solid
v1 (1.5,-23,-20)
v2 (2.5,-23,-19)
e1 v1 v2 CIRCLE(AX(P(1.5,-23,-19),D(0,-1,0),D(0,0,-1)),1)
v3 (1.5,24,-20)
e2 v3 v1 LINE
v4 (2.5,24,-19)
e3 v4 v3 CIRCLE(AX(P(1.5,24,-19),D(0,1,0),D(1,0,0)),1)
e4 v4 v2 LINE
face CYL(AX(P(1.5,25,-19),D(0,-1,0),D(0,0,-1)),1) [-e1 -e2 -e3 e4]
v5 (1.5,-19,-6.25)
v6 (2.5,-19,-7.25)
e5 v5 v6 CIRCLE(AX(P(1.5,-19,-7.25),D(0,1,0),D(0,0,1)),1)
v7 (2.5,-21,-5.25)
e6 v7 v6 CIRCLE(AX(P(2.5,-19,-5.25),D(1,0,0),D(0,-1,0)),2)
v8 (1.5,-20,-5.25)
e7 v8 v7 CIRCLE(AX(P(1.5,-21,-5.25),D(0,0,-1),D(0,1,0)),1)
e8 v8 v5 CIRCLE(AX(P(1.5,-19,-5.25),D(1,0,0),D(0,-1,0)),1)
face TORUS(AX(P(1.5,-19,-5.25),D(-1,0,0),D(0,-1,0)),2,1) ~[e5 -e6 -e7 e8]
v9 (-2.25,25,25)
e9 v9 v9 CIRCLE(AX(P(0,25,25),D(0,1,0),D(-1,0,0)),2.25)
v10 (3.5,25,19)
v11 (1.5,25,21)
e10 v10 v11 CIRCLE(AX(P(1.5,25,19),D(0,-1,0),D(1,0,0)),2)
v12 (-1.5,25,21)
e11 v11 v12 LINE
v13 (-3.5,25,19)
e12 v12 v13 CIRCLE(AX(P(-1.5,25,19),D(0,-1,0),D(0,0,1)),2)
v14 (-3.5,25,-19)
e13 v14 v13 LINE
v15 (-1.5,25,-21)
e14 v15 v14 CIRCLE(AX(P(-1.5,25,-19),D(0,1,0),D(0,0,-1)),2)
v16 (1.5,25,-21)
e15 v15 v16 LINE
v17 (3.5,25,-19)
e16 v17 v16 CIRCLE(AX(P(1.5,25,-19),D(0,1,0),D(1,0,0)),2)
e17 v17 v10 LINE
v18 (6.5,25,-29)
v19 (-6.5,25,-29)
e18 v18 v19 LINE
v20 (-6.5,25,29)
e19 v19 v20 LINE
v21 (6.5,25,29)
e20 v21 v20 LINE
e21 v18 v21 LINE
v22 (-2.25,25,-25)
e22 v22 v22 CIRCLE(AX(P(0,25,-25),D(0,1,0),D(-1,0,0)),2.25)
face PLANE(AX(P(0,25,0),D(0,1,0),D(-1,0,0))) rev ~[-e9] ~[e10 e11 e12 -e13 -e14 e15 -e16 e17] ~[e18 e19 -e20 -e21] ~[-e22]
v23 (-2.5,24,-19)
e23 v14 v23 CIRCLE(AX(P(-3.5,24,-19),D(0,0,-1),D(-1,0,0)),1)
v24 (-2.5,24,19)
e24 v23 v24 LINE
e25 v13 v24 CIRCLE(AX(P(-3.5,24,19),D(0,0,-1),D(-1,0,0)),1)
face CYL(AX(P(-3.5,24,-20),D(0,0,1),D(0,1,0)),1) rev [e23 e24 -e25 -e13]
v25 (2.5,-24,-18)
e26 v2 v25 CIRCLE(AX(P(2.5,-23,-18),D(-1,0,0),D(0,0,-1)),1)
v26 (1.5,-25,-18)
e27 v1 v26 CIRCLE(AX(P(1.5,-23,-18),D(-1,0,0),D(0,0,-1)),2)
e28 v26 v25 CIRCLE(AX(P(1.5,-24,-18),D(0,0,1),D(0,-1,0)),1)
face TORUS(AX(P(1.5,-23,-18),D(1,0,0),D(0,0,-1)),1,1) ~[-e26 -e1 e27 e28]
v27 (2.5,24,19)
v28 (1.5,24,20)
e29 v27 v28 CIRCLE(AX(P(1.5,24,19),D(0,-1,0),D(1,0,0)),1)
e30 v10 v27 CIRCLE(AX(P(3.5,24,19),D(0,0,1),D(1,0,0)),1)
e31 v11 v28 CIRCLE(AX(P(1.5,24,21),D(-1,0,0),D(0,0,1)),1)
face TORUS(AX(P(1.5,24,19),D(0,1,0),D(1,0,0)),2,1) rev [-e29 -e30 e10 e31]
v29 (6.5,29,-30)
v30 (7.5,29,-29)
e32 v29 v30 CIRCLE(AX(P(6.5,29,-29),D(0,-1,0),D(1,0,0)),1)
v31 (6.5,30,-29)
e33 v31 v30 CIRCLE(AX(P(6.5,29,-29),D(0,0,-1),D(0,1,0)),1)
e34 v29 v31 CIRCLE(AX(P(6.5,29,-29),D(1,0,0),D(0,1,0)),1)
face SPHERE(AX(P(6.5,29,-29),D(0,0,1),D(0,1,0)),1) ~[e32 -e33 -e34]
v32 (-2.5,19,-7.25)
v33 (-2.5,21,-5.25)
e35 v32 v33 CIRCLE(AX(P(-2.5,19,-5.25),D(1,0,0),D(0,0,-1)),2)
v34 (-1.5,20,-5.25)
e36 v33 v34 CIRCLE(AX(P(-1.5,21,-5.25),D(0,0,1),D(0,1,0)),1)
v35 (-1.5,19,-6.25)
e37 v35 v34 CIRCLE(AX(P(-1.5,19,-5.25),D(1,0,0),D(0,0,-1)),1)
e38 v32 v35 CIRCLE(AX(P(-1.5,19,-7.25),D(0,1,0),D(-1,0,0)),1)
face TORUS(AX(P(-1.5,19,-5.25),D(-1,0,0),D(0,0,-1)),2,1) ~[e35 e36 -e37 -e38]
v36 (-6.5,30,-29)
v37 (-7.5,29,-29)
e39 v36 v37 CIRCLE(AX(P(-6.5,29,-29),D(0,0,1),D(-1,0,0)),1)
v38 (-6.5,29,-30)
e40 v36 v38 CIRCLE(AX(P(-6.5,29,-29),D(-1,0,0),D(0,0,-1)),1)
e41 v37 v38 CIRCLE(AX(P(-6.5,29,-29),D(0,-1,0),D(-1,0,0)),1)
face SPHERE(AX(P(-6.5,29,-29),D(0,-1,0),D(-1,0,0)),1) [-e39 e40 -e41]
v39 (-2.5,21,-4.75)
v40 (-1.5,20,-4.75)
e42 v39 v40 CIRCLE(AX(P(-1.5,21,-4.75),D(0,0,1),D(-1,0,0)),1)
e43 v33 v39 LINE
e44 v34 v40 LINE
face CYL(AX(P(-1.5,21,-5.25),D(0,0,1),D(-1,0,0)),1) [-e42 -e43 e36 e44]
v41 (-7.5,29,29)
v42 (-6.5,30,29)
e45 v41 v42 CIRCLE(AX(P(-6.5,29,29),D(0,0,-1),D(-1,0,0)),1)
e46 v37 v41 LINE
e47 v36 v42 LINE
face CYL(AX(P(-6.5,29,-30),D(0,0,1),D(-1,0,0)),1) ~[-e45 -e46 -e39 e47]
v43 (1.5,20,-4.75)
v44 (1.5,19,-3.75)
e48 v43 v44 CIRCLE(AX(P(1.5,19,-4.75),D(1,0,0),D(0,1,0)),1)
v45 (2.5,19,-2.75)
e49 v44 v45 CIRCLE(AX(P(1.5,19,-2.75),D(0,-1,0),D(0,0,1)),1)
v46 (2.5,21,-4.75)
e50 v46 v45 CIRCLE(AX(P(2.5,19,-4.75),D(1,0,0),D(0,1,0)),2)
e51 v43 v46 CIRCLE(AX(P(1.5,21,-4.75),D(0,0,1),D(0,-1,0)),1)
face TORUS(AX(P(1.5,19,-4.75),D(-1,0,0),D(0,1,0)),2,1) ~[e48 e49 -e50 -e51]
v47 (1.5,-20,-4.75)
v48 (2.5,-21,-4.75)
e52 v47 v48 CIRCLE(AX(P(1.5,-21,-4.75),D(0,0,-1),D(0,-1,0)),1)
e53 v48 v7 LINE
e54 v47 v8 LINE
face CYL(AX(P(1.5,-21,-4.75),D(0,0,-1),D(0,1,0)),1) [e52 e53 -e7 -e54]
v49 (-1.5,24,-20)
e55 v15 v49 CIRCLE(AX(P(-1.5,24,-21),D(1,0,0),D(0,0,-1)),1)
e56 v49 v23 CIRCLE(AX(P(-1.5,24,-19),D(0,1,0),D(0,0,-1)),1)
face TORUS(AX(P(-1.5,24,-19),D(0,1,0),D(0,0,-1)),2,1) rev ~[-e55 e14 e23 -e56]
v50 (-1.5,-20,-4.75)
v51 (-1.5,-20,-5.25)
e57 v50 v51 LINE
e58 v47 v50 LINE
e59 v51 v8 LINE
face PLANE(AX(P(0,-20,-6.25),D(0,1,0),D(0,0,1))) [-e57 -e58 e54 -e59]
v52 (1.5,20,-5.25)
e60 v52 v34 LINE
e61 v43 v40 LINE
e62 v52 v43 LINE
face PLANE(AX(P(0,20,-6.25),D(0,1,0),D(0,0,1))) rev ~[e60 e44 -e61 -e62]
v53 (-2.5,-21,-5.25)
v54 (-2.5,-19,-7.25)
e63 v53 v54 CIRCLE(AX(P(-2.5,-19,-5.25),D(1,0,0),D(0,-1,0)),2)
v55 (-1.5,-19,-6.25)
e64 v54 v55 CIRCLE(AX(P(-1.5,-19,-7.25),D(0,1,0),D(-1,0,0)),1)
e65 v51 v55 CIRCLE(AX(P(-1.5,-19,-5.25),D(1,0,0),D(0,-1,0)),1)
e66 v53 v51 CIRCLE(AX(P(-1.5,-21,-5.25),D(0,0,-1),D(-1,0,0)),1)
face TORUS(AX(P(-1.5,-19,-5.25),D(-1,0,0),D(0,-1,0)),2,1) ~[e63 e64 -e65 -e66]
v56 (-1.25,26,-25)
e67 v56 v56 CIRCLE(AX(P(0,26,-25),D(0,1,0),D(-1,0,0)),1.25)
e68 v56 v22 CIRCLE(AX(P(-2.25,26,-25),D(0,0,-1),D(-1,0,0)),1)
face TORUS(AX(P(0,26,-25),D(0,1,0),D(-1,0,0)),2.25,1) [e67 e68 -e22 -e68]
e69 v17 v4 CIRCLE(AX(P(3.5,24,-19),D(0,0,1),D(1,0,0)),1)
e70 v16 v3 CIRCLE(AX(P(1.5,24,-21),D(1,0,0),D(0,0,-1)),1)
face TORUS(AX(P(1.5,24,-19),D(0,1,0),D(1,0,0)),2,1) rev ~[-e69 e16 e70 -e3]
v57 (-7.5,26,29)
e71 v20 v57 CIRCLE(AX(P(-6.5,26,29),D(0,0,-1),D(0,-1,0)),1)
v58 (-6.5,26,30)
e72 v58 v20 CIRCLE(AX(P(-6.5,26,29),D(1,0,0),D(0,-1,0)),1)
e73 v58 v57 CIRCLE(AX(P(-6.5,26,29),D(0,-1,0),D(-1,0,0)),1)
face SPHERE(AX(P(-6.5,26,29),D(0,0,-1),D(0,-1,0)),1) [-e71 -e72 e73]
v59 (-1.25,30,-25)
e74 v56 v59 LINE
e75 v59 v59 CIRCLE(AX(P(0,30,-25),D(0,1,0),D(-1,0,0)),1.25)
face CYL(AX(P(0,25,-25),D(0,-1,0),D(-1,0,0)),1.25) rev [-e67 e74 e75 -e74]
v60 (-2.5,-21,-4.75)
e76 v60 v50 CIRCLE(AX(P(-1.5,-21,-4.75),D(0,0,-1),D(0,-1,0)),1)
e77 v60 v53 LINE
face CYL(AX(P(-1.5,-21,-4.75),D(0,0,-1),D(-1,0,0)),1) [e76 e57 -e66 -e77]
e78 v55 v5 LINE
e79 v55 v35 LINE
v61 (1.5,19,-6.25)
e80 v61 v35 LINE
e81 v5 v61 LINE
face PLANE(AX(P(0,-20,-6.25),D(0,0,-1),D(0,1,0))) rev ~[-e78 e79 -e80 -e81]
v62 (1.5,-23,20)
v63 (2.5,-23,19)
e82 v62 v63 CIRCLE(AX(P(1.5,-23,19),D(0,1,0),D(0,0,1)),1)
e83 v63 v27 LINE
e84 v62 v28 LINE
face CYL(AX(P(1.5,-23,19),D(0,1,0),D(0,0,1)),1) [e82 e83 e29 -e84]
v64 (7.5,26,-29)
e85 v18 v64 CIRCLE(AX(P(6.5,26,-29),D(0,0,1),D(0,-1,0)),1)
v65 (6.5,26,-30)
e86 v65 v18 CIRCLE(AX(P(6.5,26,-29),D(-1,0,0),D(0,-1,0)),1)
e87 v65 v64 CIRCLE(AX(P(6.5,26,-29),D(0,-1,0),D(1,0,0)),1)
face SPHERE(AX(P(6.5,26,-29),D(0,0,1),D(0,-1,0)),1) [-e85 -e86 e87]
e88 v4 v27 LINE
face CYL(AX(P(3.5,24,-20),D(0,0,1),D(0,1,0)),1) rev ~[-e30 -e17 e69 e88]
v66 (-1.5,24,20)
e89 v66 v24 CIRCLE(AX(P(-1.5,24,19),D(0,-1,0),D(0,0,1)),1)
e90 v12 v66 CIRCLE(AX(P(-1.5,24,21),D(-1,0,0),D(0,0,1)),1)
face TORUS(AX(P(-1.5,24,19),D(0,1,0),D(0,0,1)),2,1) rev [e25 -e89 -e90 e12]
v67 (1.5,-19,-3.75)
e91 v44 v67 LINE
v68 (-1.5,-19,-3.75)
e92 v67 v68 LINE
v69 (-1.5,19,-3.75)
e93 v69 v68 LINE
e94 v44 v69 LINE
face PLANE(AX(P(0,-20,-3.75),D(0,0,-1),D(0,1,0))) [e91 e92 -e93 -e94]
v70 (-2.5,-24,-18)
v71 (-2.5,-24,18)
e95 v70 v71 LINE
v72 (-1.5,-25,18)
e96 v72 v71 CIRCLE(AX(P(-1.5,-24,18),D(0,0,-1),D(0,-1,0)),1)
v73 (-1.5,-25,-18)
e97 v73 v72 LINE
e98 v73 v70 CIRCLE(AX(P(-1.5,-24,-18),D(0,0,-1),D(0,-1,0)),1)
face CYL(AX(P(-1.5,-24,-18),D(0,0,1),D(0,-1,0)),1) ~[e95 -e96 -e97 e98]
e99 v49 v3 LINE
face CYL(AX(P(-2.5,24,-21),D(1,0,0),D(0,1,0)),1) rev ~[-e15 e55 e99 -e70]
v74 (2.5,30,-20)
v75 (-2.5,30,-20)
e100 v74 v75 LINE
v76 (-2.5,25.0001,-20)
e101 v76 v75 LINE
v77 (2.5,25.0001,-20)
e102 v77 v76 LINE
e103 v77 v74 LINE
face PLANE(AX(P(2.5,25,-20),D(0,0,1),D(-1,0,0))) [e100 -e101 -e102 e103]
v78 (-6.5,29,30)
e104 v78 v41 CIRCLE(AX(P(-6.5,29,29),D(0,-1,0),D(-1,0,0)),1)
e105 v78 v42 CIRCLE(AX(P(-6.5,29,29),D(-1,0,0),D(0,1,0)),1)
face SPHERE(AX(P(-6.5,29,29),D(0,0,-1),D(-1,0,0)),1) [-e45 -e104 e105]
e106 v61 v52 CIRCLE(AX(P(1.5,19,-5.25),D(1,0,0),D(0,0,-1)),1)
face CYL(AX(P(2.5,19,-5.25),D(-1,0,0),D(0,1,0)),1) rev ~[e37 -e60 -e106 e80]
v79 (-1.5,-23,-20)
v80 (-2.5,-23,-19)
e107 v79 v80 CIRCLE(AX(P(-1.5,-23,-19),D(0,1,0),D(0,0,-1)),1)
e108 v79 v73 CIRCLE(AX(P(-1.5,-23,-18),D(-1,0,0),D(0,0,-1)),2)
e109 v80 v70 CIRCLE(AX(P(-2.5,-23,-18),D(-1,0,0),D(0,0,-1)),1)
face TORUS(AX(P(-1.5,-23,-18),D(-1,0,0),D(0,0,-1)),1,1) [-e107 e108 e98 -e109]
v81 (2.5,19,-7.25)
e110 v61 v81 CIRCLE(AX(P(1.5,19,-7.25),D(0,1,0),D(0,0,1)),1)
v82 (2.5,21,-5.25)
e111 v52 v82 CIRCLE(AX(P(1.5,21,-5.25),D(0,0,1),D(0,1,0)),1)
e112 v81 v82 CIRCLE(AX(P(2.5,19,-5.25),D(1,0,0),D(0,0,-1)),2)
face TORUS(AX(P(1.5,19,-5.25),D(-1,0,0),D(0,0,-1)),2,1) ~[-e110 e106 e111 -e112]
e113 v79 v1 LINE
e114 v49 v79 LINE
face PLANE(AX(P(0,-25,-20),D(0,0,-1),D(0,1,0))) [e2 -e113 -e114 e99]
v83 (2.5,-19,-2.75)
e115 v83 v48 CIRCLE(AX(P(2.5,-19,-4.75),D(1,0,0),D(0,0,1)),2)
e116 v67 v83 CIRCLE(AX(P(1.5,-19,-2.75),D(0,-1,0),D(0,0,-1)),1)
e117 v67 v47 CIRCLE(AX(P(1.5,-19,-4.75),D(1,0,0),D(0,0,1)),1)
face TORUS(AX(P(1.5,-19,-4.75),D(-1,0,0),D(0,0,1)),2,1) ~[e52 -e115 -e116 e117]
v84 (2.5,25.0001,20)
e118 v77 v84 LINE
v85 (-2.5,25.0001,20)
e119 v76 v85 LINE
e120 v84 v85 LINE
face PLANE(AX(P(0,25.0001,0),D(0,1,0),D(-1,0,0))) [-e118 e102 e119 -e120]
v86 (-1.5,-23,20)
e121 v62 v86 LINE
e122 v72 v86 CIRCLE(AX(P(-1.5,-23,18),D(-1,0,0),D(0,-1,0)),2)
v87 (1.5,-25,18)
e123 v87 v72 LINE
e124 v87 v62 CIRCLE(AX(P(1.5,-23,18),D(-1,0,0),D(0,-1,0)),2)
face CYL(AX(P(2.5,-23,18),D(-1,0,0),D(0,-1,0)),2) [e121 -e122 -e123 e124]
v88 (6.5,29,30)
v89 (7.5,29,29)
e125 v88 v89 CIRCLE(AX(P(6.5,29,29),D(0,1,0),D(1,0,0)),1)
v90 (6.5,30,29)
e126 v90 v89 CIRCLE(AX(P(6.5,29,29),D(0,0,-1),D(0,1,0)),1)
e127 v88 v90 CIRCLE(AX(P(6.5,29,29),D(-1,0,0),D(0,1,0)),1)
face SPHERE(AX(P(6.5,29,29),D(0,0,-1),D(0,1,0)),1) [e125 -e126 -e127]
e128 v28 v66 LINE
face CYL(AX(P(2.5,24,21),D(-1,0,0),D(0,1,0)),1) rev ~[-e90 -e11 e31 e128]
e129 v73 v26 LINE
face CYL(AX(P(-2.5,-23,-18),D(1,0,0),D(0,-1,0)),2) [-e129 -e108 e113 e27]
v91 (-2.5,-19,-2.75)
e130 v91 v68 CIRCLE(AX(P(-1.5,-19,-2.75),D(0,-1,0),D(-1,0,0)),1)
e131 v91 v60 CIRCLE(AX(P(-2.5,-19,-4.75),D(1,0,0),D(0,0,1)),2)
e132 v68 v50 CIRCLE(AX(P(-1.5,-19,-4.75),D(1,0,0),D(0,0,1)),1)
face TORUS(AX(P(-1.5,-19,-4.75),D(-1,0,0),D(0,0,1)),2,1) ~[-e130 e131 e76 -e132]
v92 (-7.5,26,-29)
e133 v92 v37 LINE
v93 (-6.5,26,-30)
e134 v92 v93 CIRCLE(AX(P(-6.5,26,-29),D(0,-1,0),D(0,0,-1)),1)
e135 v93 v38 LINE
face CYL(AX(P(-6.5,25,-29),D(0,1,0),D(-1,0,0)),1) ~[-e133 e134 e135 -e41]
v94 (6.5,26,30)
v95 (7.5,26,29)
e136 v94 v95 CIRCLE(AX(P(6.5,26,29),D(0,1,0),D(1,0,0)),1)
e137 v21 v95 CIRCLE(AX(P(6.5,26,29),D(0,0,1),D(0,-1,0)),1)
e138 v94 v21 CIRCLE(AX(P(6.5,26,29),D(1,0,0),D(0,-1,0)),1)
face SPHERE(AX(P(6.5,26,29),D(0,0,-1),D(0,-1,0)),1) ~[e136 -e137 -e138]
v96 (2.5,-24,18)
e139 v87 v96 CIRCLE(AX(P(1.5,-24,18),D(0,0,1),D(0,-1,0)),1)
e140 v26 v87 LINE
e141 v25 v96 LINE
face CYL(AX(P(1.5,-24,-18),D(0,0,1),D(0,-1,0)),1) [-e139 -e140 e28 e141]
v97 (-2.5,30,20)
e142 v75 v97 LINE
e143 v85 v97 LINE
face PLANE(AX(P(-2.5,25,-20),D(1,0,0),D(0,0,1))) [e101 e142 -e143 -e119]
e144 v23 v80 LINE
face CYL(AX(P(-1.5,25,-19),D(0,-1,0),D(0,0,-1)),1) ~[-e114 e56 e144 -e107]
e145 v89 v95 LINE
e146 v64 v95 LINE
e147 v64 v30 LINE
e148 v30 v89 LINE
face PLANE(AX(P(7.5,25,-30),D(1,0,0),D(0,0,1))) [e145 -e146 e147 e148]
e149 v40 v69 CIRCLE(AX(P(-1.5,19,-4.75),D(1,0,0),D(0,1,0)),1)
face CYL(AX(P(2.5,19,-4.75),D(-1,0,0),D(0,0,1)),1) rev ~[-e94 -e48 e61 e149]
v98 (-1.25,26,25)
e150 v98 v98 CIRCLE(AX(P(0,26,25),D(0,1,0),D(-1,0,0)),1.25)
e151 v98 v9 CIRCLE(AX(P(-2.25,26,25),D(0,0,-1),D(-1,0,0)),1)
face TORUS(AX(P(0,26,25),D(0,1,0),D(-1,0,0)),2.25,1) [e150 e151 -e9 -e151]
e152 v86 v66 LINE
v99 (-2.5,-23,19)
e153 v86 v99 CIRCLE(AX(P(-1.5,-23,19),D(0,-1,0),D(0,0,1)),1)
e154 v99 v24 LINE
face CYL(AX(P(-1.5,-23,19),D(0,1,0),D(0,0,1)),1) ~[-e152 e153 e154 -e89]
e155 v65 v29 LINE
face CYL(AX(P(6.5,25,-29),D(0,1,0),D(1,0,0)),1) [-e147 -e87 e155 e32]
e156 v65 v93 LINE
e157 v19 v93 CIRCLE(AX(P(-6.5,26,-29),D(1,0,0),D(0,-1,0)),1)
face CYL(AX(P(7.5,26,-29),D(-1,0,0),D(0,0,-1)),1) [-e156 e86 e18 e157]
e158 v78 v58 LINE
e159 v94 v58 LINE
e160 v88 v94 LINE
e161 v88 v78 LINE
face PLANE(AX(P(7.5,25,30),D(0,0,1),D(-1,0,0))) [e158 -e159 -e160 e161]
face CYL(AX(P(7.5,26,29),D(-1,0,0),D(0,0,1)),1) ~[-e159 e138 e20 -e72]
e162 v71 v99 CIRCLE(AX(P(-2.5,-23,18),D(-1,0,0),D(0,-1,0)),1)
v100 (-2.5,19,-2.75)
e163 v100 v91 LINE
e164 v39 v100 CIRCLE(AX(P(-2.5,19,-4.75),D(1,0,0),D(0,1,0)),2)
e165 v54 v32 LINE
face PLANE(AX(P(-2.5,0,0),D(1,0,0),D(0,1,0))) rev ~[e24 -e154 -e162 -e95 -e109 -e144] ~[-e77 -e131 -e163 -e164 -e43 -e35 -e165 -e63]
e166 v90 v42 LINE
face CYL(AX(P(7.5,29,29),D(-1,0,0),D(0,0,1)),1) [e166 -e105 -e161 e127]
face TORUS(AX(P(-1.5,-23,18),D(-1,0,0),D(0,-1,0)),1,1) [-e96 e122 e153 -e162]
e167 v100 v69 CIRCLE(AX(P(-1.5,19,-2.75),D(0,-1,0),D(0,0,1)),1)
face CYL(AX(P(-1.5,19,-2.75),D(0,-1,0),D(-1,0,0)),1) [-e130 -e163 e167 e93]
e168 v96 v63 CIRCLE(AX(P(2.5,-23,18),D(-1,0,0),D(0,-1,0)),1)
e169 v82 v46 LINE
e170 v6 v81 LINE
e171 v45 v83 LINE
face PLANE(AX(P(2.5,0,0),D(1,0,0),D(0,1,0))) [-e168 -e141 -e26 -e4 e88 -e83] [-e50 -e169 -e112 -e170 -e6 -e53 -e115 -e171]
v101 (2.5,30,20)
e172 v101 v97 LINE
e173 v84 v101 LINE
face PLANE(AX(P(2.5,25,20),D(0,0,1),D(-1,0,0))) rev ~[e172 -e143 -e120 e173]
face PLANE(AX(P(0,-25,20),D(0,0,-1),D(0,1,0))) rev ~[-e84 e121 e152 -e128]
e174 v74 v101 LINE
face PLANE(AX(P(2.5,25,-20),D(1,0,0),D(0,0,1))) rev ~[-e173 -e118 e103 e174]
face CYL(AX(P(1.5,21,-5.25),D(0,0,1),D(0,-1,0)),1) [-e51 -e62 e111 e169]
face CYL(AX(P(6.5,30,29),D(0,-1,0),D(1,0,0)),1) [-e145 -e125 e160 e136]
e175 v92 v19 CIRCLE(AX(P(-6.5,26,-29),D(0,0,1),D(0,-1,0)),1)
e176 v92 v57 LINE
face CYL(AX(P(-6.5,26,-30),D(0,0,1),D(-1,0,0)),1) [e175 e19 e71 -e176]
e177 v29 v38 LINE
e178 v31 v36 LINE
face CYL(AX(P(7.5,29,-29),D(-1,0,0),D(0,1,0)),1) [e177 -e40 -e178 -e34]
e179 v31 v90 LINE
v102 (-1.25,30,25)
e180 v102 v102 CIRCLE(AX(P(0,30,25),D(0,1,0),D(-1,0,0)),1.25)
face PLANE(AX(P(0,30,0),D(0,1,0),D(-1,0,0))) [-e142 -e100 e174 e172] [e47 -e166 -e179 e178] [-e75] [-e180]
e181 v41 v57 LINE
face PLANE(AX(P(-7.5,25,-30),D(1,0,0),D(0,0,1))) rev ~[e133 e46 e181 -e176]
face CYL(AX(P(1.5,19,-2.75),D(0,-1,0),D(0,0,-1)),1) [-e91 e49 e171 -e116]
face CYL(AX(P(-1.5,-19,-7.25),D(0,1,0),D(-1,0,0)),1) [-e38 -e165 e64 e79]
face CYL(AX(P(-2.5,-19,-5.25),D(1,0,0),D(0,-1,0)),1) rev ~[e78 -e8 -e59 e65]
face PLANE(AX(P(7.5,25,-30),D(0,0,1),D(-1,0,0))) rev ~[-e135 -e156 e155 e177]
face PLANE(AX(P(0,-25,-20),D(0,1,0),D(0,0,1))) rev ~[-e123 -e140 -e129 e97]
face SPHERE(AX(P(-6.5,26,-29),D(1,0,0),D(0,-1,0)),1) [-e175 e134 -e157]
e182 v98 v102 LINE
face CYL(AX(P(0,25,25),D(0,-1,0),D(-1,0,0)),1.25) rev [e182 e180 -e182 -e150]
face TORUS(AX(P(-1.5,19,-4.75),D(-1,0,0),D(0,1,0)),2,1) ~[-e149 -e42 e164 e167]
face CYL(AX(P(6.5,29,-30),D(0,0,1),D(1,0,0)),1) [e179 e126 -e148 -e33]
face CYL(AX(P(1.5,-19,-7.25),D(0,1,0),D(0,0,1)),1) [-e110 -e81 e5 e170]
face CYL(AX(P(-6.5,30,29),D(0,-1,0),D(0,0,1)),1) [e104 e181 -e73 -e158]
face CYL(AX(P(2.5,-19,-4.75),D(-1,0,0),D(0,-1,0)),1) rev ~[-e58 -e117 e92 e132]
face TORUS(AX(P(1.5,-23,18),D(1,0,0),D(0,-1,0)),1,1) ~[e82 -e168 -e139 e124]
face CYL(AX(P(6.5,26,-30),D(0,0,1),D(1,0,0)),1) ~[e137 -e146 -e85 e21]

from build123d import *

# Parameters (mm, degrees)
F0_W     = 50
F0_H     = 40
F0_W_2   = 40
F0_H_2   = 2.5
F1_DEPTH = 2.5
F2_R     = 1
F3_R     = 2
F4_W     = 15
F4_H     = 60
F4_R     = 1.25
F4_W_2   = 5
F4_H_2   = 40
F5_DEPTH = 5
F6_DEPTH = 0.0001
F7_R     = 1


with BuildPart() as f1:
    # F0 (on Right) → F1 (new body, symmetric)
    with BuildSketch(Plane.YZ):
        Rectangle(F0_W, F0_H)
        with Locations((0, -5)):
            Rectangle(F0_W_2, F0_H_2, mode=Mode.SUBTRACT)
    extrude(amount=F1_DEPTH, both=True)

    # F2
    f2_edges = [f1.edges().sort_by_distance(p)[0] for p in [
        (0, -20, -6.25),
        (0, 20, -6.25),
        (0, 20, -3.75),
        (0, -20, -3.75),
    ]]
    fillet(f2_edges, radius=F2_R)

    # F3
    f3_edges = [f1.edges().sort_by_distance(p)[0] for p in [
        (0, -25, 20),
        (0, -25, -20),
    ]]
    fillet(f3_edges, radius=F3_R)

    # F4 (on face) → F5 (join)
    with BuildSketch(Plane(origin=(0, 25, 0), x_dir=(-1, 0, 0), z_dir=(0, 1, 0))):
        Rectangle(F4_W, F4_H)
        with Locations((0, -25)):
            Circle(F4_R, mode=Mode.SUBTRACT)
        Rectangle(F4_W_2, F4_H_2, mode=Mode.SUBTRACT)
        with Locations((0, 25)):
            Circle(F4_R, mode=Mode.SUBTRACT)
    extrude(amount=F5_DEPTH)

    # F4 (on face) → F6 (join)
    with BuildSketch(Plane(origin=(0, 25, 0), x_dir=(-1, 0, 0), z_dir=(0, 1, 0))):
        Rectangle(F4_W, F4_H)
        with Locations((0, -25)):
            Circle(F4_R, mode=Mode.SUBTRACT)
        with Locations((0, 25)):
            Circle(F4_R, mode=Mode.SUBTRACT)
    extrude(amount=F6_DEPTH)

    # F7
    f7_edges = [f1.edges().sort_by_distance(p)[0] for p in [
        (2.5, -25, 0),
        (2.5, -24.414214, 19.414214),
        (2.5, -24.414214, -19.414214),
        (2.5, 1, 20),
        (2.5, 1, -20),
        (2.5, 25, 0),
        (2.5, 0, -6.25),
        (2.5, 19.707107, -5.957107),
        (2.5, -19.707107, -5.957107),
        (2.5, 20, -5),
        (2.5, -20, -5),
        (2.5, 19.707107, -4.042893),
        (2.5, -19.707107, -4.042893),
        (2.5, 0, -3.75),
        (7.5, 25, 0),
        (0, 25, -30),
        (-7.5, 25, 0),
        (0, 25, 30),
        (1.25, 25, -25),
        (0, 25, -20),
        (0, 25, 20),
        (-2.5, 25, 0),
        (1.25, 25, 25),
        (-2.5, -25, 0),
        (-2.5, -24.414214, 19.414214),
        (-2.5, -24.414214, -19.414214),
        (-2.5, 1, 20),
        (-2.5, 1, -20),
        (-2.5, 0, -6.25),
        (-2.5, 19.707107, -5.957107),
        (-2.5, -19.707107, -5.957107),
        (-2.5, 20, -5),
        (-2.5, -20, -5),
        (-2.5, 19.707107, -4.042893),
        (-2.5, -19.707107, -4.042893),
        (-2.5, 0, -3.75),
        (-7.5, 27.5, -30),
        (-7.5, 30, 0),
        (-7.5, 27.5, 30),
        (7.5, 30, 0),
        (0, 30, -30),
        (0, 30, 30),
        (7.5, 27.5, 30),
        (7.5, 27.5, -30),
    ]]
    fillet(f7_edges, radius=F7_R)


solid = f1.part
